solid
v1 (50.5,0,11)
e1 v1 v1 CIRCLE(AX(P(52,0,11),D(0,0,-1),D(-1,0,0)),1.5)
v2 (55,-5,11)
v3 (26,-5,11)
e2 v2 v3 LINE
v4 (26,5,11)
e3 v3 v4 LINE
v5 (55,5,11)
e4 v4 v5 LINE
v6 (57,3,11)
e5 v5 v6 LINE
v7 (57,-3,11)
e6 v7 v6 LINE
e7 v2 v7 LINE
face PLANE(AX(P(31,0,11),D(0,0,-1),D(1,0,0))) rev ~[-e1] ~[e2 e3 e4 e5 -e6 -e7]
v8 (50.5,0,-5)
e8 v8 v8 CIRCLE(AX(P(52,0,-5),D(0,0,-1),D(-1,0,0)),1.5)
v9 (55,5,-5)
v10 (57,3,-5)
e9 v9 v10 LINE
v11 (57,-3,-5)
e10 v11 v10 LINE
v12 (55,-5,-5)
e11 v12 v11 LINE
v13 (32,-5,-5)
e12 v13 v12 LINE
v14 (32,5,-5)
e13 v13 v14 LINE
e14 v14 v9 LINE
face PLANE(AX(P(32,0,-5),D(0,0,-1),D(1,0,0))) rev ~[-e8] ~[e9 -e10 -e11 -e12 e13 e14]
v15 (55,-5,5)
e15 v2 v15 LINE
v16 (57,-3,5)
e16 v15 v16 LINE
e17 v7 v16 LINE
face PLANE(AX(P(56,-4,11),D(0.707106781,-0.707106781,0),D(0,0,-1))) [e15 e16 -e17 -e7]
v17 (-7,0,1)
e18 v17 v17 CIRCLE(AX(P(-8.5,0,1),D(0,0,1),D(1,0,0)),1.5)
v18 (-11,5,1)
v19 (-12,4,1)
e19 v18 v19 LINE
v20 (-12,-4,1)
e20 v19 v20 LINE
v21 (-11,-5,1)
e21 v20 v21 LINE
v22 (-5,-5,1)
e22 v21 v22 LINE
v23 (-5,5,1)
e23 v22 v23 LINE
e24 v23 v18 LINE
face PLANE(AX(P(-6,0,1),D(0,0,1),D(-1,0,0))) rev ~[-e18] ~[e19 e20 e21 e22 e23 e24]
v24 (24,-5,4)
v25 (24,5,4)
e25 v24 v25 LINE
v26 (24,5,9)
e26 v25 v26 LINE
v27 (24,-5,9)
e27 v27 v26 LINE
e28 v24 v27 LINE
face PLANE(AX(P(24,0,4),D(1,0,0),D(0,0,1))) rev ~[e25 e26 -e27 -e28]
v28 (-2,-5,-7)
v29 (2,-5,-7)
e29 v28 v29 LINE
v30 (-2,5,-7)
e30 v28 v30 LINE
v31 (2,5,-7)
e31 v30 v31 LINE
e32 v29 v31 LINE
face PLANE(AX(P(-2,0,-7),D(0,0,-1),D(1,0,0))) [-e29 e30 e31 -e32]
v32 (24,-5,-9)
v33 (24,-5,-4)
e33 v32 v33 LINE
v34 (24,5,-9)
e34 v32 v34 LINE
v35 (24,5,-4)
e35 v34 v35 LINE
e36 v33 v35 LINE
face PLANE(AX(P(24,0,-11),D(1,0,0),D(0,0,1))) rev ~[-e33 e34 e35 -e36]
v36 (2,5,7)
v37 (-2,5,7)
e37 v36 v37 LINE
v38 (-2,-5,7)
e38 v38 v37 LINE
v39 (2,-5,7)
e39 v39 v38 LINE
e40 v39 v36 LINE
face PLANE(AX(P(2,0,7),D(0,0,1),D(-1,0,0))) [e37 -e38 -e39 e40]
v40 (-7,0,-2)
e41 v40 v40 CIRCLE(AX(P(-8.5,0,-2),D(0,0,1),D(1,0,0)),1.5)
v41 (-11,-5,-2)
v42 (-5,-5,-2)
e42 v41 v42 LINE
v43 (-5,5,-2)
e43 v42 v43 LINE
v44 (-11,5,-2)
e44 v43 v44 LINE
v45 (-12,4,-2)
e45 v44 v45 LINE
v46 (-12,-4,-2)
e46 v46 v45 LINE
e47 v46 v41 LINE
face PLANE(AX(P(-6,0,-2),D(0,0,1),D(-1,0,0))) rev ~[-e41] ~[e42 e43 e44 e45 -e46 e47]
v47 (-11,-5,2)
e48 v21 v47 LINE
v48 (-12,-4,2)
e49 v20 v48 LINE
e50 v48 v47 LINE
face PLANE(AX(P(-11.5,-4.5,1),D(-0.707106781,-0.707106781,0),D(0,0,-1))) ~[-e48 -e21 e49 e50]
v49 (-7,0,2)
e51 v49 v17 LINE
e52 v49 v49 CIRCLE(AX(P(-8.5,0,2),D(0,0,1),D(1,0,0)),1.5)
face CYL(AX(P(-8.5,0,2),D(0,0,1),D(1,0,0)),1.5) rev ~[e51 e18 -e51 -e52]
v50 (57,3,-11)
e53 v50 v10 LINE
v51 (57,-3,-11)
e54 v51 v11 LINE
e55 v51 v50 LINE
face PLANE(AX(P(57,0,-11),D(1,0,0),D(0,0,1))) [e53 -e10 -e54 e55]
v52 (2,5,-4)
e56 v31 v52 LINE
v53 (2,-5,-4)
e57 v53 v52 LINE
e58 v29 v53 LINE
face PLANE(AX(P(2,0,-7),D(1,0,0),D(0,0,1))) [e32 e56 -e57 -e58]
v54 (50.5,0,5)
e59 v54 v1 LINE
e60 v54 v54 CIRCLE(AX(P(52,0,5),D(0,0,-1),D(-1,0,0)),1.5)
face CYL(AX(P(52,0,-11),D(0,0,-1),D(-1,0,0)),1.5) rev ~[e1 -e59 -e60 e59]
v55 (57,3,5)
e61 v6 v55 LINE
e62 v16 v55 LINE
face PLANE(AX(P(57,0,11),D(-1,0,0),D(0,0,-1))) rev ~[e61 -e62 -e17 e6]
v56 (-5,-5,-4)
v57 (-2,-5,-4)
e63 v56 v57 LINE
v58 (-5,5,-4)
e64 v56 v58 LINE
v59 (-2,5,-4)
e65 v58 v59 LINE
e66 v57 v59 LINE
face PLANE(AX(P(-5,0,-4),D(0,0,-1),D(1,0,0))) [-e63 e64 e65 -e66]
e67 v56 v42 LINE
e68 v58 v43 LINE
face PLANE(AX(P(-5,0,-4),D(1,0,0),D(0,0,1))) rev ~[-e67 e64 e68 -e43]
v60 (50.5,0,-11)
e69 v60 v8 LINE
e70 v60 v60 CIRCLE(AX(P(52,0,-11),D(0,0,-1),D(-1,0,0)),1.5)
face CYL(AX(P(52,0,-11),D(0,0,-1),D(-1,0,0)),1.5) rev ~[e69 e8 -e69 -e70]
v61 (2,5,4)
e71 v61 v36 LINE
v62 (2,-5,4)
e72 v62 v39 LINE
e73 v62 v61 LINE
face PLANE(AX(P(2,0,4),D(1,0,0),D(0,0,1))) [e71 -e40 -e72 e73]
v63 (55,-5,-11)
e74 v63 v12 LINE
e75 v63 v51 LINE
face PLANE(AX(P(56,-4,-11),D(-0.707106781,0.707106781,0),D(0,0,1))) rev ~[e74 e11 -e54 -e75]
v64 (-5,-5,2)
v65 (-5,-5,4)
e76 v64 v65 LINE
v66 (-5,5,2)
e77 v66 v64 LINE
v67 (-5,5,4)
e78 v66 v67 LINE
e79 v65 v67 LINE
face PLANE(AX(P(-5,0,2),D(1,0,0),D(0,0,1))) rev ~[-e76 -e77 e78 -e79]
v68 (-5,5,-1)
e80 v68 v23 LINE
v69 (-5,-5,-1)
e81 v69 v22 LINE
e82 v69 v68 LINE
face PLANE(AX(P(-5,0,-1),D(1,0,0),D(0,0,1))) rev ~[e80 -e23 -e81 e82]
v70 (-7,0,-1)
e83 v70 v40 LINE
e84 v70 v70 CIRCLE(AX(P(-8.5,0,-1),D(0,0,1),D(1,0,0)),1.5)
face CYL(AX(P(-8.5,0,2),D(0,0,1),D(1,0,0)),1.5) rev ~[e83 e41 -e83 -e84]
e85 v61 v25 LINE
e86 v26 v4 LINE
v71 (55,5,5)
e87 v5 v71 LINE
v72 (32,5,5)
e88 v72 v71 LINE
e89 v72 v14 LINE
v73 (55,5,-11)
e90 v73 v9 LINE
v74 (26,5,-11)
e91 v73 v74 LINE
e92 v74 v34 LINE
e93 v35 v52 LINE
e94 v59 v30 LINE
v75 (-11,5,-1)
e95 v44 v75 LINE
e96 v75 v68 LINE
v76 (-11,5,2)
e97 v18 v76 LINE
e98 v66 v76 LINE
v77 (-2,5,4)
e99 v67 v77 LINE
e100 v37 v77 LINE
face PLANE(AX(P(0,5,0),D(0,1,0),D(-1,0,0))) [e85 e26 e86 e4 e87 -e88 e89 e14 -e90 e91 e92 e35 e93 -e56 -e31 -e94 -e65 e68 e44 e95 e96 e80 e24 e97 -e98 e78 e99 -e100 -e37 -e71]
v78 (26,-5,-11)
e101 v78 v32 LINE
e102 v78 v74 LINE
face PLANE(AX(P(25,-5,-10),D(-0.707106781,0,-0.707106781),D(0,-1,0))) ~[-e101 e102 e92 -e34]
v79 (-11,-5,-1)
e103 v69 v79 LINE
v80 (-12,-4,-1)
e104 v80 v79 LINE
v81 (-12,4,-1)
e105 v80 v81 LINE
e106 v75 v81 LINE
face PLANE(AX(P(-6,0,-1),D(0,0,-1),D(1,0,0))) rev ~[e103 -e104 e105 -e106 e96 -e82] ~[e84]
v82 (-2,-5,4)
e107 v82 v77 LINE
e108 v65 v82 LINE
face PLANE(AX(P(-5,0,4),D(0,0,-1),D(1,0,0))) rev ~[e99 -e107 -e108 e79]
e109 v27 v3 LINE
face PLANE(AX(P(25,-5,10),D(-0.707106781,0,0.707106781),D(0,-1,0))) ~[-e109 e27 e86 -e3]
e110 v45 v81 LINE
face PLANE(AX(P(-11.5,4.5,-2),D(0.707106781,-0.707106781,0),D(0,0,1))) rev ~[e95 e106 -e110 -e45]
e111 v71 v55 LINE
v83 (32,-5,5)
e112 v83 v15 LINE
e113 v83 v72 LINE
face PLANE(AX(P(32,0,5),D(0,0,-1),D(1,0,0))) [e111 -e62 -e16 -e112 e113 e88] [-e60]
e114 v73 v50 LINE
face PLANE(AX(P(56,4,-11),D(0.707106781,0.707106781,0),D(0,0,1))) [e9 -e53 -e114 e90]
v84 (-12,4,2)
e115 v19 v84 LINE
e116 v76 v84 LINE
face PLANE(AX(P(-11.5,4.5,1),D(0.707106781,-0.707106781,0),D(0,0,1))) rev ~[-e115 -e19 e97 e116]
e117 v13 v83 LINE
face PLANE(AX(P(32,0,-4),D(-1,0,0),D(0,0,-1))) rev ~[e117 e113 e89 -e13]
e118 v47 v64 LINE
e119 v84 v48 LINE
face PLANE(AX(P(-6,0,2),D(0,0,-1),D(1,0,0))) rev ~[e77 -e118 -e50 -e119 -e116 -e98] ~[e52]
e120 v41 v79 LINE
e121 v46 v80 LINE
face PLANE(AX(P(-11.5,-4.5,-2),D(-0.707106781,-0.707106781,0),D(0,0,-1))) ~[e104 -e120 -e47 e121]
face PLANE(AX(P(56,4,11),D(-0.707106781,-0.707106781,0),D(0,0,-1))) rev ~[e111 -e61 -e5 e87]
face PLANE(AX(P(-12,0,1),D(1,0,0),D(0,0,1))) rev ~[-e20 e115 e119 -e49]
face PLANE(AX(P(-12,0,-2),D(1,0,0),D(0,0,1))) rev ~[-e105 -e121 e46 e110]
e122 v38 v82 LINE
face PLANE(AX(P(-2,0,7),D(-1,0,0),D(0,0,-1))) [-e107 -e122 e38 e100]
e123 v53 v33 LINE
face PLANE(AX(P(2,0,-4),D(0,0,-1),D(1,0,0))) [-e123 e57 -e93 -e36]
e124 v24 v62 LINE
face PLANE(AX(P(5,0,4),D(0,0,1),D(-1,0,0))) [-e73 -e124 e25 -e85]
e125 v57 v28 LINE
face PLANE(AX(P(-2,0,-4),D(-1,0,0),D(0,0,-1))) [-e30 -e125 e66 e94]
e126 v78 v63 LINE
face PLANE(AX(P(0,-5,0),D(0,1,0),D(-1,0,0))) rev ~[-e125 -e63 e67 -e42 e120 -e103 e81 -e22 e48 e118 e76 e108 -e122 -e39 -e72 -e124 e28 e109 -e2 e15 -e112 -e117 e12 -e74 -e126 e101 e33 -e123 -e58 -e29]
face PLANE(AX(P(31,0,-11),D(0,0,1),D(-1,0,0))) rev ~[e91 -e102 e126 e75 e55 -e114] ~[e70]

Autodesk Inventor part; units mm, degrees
ref_plane "YZ Plane" through (0, 0, 0) normal (1, 0, 0) x (0, 1, 0)
ref_plane "XZ Plane" through (0, 0, 0) normal (0, 1, 0) x (-1, 0, 0)
ref_plane "Work Plane1" through (0, 0, -10) normal (0, 0, 1) x (1, 0, 0)
sketch "Sketch12" plane through (0, 0, 0) normal (0, 1, 0) x (-1, 0, 0)
  line L0 (5, 4) -> (2, 4)
  line L1 (-2, 4) -> (-2, 7)
  line L2 (-2, 7) -> (2, 7)
  line L3 (2, 7) -> (2, 4)
  line L4 (6, 1) -> (12, 1)
  line L5 (12, -1) -> (6, -1)
  line L6 (12, -1) -> (6, -1)
  line L7 (6, -2) -> (12, -2)
  line L8 (5, -4) -> (5, 4)
  line L9 (12, -2) -> (12, -1)
  line L10 (12, 1) -> (12, 2)
  line L11 (12, 2) -> (6, 2)
  line L12 (6, -2) -> (5, -2)
  line L13 (6, -1) -> (5, -1)
  line L14 (6, 1) -> (5, 1)
  line L15 (6, 2) -> (5, 2)
  line L16 (-31, -11) -> (-57, -11)
  line L17 (-57, -11) -> (-57, -5)
  line L18 (-31, 11) -> (-57, 11)
  line L19 (-57, 11) -> (-57, 5)
  line L20 (-31, -11) -> (-24, -11)
  line L21 (-24, -11) -> (-24, -4)
  line L22 (-24, -4) -> (-24, 11)
  line L23 (-24, 11) -> (-31, 11)
  line L24 (-32, -4) -> (-32, 4)
  line L25 (-32, 4) -> (-32, 5)
  line L26 (-32, 5) -> (-57, 5)
  line L27 (-32, -4) -> (-32, -5)
  line L28 (-32, -5) -> (-57, -5)
  line L29 (5, -4) -> (2, -4)
  line L30 (2, -4) -> (2, -7)
  line L31 (2, -7) -> (-2, -7)
  line L32 (-2, -7) -> (-2, -4)
  line L33 (-2, -4) -> (-5, -4)
  line L34 (-5, -4) -> (-5, 4)
  line L35 (-5, 4) -> (-2, 4)
  line L36 (-5, 4) -> (-24, 4)
  line L37 (-5, -4) -> (-24, -4)
  point P0 (0, 0)
  point P1 (-31, 4)
  dimension "d118" = 4
  dimension "d156" = 7
  dimension "d170" = 3
  dimension "d171" = 3
ref_plane "Work Plane3" through (-12, 0, 2) normal (0, 0, 1) x (1, 0, 0)
extrude "Extrusion16" add sketch "Sketch12" along normal mid plane 10
extrude "Extrusion17" add sketch "Sketch12" along normal mid plane 8 contours L15 L11 L10 L4 L14 L8 | L13 L5 L9 L7 L12 L8
sketch "Sketch17" plane through (-12, 4, 2) normal (0, 0, 1) x (1, 0, 0)
  line L0 (7, -9) -> (7, 1) projected
  line L1 (7, -8) -> (3.5, -8)
  line L2 (0, -8) -> (7, -8) projected
  circle A0 centre (3.5, -4) radius 1.5
  point P0 (12, -4)
  point P1 (7, 0)
  dimension "d173" = 3
extrude "Extrusion18" cut sketch "Sketch17" against normal through all
extrude "Extrusion19" add sketch "Sketch12" along normal mid plane 6 contours L22 L21 L20 L16 L17 L28 L27 L24 L25 L26 L19 L18 L23
sketch "Sketch18" plane through (57, 3, -11) normal (0, 0, -1) x (-1, 0, 0)
  line L0 (0, -6) -> (0, 0) projected
  circle A0 centre (5, -3) radius 1.5
  point P0 (57, -3)
  dimension "d162" = 3
extrude "Extrusion20" cut sketch "Sketch18" against normal through all
chamfer "Chamfer12" distance 2 angle 45 6 edges at (57, 5, 8) (57, -5, 8) (57, 5, -8) (57, -5, -8) (24, 0, 11) (24, 0, -11)
chamfer "Chamfer13" distance 1 angle 45 4 edges at (-12, 5, 1.5) (-12, -5, 1.5) (-12, -5, -1.5) (-12, 5, -1.5)
properties part number "finger"
